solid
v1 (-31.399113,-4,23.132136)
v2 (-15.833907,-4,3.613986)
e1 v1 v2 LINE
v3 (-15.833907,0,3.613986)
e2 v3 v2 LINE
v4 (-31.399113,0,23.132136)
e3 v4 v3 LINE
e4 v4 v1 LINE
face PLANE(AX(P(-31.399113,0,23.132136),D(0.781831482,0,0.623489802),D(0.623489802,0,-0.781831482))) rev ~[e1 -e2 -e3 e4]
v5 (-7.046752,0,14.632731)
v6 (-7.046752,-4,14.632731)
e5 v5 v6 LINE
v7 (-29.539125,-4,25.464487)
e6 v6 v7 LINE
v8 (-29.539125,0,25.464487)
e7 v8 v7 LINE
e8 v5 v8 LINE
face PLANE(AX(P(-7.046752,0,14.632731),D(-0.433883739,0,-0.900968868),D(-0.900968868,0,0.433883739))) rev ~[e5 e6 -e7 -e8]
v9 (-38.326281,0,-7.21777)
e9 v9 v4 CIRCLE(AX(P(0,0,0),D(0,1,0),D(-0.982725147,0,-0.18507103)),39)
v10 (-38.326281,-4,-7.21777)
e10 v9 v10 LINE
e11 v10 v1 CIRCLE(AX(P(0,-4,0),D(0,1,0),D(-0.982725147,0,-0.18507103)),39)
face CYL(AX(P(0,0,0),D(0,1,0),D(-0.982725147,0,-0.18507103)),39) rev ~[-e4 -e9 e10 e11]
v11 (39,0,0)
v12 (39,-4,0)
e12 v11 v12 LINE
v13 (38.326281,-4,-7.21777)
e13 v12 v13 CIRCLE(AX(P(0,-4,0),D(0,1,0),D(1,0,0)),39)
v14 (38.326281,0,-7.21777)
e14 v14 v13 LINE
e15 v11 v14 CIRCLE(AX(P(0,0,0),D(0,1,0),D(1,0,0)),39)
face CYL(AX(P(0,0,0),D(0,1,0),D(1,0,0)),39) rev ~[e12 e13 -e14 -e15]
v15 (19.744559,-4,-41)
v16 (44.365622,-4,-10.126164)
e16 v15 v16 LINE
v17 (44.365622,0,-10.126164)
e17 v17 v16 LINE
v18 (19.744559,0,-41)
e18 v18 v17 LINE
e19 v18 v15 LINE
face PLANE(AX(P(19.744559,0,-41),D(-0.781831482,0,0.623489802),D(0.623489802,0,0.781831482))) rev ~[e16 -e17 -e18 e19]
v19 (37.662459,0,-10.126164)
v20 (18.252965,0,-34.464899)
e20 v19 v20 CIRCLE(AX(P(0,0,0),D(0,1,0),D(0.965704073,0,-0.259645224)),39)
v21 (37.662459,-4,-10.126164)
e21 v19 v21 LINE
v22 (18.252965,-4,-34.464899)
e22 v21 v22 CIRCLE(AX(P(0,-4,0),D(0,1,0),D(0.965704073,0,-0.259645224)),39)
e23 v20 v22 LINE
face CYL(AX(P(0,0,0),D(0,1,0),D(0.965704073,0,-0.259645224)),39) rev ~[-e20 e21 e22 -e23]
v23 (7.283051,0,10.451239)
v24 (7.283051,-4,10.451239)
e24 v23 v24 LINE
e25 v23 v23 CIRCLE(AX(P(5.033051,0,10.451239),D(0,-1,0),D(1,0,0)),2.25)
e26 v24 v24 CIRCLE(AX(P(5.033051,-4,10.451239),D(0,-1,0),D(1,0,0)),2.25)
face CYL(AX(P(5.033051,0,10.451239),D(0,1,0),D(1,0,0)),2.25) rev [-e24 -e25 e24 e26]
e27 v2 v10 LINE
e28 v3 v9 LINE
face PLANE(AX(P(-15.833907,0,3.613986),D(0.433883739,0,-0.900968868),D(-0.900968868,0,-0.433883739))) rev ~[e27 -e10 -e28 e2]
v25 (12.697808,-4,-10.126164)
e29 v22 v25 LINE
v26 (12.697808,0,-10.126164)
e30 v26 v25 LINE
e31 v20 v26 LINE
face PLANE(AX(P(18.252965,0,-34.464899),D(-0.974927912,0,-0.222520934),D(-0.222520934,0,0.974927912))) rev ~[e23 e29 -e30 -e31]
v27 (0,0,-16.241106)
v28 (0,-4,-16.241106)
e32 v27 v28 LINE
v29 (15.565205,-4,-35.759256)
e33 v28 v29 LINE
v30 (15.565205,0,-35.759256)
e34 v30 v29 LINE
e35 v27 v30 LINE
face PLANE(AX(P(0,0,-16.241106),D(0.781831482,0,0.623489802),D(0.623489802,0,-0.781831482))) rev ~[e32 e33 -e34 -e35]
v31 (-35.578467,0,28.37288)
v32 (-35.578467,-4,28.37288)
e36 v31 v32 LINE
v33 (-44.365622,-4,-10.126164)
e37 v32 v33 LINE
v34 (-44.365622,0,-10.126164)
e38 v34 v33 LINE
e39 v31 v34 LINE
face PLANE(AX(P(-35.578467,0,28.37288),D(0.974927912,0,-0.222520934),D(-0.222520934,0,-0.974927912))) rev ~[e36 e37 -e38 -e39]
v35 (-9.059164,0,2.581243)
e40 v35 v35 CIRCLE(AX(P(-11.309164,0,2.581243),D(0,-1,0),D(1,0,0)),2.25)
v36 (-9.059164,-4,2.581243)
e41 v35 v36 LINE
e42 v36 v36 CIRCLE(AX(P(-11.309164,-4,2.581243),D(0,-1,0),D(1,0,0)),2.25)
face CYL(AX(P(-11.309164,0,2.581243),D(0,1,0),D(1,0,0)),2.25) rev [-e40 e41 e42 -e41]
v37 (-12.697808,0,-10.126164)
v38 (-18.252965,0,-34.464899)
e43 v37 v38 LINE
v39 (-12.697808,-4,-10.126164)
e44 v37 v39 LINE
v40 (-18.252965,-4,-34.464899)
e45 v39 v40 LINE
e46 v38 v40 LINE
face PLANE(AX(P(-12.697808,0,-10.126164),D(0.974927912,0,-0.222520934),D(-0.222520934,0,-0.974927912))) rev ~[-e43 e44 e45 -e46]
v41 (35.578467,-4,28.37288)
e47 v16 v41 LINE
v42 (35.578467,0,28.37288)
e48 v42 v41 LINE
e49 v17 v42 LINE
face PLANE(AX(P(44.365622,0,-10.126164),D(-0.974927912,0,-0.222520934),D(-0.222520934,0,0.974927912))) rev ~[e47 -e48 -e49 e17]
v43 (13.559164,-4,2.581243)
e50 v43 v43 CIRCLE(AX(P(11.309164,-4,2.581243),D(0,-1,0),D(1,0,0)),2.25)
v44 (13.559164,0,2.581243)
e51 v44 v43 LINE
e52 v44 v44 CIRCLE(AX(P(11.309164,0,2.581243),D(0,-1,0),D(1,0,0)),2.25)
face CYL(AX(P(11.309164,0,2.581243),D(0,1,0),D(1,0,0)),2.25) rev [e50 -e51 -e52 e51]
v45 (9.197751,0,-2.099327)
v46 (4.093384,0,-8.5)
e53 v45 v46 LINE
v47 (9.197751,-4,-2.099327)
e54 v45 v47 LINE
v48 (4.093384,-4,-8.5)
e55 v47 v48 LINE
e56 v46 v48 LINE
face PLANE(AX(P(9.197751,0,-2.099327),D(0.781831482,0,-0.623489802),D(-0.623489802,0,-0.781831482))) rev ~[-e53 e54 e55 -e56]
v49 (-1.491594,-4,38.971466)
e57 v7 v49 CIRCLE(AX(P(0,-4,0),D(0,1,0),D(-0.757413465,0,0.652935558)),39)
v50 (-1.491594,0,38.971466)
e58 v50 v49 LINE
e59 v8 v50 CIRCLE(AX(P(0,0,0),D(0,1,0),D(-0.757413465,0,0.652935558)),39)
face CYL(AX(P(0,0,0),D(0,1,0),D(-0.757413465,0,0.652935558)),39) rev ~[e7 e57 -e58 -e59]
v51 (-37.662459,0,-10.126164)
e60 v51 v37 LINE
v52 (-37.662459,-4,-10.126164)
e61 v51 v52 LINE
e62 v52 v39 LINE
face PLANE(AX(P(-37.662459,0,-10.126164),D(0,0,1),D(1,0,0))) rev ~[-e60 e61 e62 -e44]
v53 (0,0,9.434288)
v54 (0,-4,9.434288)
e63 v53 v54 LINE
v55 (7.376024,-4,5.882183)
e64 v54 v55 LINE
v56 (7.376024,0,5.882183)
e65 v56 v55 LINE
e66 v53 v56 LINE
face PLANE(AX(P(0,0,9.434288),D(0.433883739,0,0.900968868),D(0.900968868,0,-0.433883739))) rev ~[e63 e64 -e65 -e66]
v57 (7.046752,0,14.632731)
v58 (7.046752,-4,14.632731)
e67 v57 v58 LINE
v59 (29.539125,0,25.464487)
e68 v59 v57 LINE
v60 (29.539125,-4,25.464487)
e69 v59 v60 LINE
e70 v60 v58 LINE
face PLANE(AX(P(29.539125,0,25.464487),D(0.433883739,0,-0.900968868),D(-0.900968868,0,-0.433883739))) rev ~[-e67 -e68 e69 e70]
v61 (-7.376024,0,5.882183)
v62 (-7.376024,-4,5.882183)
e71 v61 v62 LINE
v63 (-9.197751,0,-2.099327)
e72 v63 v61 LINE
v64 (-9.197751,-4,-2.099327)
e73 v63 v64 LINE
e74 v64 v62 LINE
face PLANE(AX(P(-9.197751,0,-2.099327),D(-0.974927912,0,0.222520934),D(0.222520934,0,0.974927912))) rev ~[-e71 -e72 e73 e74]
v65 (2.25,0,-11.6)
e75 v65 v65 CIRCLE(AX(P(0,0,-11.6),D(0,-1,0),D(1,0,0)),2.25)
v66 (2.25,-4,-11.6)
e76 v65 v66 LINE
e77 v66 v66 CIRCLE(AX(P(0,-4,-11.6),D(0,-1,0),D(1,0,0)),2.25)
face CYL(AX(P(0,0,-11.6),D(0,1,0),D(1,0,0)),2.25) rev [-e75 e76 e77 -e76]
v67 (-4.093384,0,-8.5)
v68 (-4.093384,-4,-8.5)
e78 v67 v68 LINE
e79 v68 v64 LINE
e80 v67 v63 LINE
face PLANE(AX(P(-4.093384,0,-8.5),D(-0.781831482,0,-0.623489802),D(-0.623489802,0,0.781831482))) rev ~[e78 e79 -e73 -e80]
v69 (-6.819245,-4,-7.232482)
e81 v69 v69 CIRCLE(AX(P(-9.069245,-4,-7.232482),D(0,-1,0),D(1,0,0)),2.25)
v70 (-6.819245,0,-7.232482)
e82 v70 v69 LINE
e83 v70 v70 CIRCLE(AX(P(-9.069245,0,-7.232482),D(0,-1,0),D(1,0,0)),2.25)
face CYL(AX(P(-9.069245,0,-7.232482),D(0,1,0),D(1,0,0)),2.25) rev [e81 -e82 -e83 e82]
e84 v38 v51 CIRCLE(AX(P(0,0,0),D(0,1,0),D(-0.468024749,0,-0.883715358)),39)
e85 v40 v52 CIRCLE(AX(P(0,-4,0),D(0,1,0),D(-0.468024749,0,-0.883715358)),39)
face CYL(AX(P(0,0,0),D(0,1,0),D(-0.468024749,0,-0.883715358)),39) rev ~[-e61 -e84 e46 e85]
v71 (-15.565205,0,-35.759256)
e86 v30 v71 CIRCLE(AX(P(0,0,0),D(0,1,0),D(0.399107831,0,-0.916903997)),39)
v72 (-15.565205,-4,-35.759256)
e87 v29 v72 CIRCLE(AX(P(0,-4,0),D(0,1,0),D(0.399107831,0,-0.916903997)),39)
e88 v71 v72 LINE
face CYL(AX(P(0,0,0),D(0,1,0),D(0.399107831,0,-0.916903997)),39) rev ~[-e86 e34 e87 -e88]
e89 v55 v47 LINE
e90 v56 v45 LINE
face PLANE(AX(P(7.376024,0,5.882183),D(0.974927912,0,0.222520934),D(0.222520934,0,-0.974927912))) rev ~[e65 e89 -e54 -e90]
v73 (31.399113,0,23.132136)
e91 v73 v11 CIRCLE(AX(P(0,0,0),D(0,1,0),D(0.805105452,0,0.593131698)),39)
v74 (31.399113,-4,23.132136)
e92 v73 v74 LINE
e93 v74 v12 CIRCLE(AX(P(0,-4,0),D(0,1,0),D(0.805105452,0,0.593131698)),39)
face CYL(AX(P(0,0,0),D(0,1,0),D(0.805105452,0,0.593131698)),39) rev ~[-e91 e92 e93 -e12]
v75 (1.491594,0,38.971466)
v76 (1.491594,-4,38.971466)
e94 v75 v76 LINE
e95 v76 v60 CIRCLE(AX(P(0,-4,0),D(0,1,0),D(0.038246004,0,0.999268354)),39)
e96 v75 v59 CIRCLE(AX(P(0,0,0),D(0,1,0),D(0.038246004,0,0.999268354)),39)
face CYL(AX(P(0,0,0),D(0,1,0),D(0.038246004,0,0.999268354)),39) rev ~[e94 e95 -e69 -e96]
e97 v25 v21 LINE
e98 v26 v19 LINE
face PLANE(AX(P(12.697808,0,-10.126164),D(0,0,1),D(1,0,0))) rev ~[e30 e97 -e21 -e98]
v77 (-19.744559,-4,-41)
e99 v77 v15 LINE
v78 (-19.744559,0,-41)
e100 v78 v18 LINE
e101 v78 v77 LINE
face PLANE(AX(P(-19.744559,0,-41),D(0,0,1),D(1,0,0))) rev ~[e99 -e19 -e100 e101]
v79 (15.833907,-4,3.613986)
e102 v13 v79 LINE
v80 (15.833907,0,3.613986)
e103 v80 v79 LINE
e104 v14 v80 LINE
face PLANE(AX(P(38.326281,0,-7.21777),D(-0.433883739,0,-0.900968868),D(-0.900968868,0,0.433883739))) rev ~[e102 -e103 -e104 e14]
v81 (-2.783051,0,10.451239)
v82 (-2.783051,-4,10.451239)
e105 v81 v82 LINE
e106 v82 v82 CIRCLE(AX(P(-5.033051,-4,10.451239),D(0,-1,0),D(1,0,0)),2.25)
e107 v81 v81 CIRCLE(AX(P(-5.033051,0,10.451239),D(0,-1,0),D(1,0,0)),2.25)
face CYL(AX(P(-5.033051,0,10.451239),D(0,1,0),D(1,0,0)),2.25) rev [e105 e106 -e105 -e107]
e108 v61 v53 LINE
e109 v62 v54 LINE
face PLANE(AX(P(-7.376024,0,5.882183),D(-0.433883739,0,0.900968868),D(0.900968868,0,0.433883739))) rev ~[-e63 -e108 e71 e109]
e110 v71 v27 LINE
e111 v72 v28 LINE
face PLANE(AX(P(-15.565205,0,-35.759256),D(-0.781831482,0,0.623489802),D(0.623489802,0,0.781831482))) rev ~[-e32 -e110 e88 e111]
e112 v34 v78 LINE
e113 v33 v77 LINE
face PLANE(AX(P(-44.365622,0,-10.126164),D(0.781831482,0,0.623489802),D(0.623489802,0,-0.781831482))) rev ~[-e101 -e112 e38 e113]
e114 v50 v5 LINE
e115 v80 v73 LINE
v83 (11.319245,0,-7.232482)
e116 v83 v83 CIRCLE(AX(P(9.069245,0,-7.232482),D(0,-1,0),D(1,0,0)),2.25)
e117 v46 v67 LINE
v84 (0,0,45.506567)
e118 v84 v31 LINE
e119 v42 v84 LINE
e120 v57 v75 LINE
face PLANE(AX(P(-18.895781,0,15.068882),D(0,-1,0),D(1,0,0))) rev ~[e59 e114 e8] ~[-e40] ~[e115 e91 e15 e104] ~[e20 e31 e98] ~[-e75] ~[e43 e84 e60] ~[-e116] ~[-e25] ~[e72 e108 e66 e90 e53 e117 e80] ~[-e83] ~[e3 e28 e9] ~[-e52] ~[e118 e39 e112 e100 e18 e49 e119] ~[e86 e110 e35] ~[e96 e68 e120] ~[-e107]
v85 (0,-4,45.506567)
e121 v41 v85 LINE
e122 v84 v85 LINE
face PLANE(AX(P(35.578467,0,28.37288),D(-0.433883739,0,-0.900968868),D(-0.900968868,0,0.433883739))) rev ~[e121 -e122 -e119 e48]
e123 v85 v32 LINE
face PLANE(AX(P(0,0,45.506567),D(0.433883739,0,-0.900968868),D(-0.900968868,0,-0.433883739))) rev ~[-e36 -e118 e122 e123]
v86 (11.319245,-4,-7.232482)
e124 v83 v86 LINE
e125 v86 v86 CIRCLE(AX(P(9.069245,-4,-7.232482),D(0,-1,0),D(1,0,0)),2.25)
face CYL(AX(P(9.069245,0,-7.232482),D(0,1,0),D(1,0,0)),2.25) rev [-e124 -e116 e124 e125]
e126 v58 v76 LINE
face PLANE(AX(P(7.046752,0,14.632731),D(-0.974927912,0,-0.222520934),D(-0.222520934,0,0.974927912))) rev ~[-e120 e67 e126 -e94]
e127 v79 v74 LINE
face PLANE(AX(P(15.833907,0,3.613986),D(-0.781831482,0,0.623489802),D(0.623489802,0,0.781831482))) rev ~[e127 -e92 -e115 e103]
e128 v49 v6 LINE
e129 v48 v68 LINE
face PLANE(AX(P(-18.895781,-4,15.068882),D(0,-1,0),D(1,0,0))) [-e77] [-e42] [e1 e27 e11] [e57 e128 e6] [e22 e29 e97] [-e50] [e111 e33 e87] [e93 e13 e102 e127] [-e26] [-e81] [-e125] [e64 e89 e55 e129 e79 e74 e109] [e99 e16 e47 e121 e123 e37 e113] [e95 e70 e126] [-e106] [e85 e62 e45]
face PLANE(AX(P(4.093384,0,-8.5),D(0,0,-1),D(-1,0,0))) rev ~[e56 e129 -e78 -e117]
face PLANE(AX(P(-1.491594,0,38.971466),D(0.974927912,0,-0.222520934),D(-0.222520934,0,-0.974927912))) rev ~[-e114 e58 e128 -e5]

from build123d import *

# Parameters (mm, degrees)
F0_R     = 2.25
F1_DEPTH = 4


# Not quite as in the source:
# - a feature names something its author has since deleted; it is built from what else it names


with BuildPart() as f1:
    # F0 (on Front) → F1 (new body)
    with BuildSketch(Plane.XZ):
        with BuildLine():
            Line((-7.0467516529, 14.6327305836), (-29.539125133, 25.4644867683))
            ThreePointArc((-29.539125133, 25.4644867683), (-30.4914278163, 24.3161022725), (-31.3991126327, 23.1321362152))
            Line((-31.3991126327, 23.1321362152), (-15.8339072365, 3.6139860008))
            Line((-15.8339072365, 3.6139860008), (-8.7871555836, 7.0075227419))
            Line((-8.7871555836, 7.0075227419), (-7.0467516529, 14.6327305836))
        make_face()
        with BuildLine():
            Line((-1.4915941641, 38.9714658032), (-7.0467516529, 14.6327305836))
            Line((-7.0467516529, 14.6327305836), (0, 11.2391938425))
            Line((0, 11.2391938425), (7.0467516529, 14.6327305836))
            Line((7.0467516529, 14.6327305836), (1.4915941641, 38.9714658032))
            ThreePointArc((1.4915941641, 38.9714658032), (0, 39), (-1.4915941641, 38.9714658032))
        make_face()
        Polygon((0, 11.2391938425), (-7.0467516529, 14.6327305836), (-8.7871555836, 7.0075227419), (-15.8339072365, 3.6139860008), (-10.9574037875, -2.5009559107), (-12.6978077182, -10.1261637524), (-4.8765034491, -10.1261637524), (0, -16.241105664), (4.8765034491, -10.1261637524), (12.6978077182, -10.1261637524), (10.9574037875, -2.5009559107), (15.8339072365, 3.6139860008), (8.7871555836, 7.0075227419), (7.0467516529, 14.6327305836), align=None)
        with Locations((-9.0692451966, -7.2324817016)):
            Circle(F0_R, mode=Mode.SUBTRACT)
        with Locations((0, -11.6)):
            Circle(F0_R, mode=Mode.SUBTRACT)
        with Locations((9.0692451966, -7.2324817016)):
            Circle(F0_R, mode=Mode.SUBTRACT)
        with Locations((-11.3091637813, 2.5812428339)):
            Circle(F0_R, mode=Mode.SUBTRACT)
        with Locations((-5.0330513738, 10.4512388677)):
            Circle(F0_R, mode=Mode.SUBTRACT)
        Polygon((-9.1977509421, -2.0993266316), (-7.376023565, 5.8821825089), (0, 9.4342882455), (7.376023565, 5.8821825089), (9.1977509421, -2.0993266316), (4.0933842599, -8.5), (-4.0933842599, -8.5), align=None, mode=Mode.SUBTRACT)
        with Locations((11.3091637813, 2.5812428339)):
            Circle(F0_R, mode=Mode.SUBTRACT)
        with Locations((5.0330513738, 10.4512388677)):
            Circle(F0_R, mode=Mode.SUBTRACT)
        with BuildLine():
            Line((29.539125133, 25.4644867683), (7.0467516529, 14.6327305836))
            Line((7.0467516529, 14.6327305836), (8.7871555836, 7.0075227419))
            Line((8.7871555836, 7.0075227419), (15.8339072365, 3.6139860008))
            Line((15.8339072365, 3.6139860008), (31.3991126327, 23.1321362152))
            ThreePointArc((31.3991126327, 23.1321362152), (30.4914278163, 24.3161022725), (29.539125133, 25.4644867683))
        make_face()
        with BuildLine():
            Line((38.3262807167, -7.2177701839), (15.8339072365, 3.6139860008))
            Line((15.8339072365, 3.6139860008), (10.9574037875, -2.5009559107))
            Line((10.9574037875, -2.5009559107), (12.6978077182, -10.1261637524))
            Line((12.6978077182, -10.1261637524), (37.6624588637, -10.1261637524))
            ThreePointArc((37.6624588637, -10.1261637524), (38.0221885751, -8.6783164243), (38.3262807167, -7.2177701839))
        make_face()
        with BuildLine():
            Line((4.8765034491, -10.1261637524), (0, -16.241105664))
            Line((0, -16.241105664), (15.5652053962, -35.7592558784))
            ThreePointArc((15.5652053962, -35.7592558784), (16.9214658256, -35.1377858482), (18.252965207, -34.464898972))
            Line((18.252965207, -34.464898972), (12.6978077182, -10.1261637524))
            Line((12.6978077182, -10.1261637524), (4.8765034491, -10.1261637524))
        make_face()
        with BuildLine():
            Line((-4.8765034491, -10.1261637524), (-12.6978077182, -10.1261637524))
            Line((-12.6978077182, -10.1261637524), (-18.252965207, -34.464898972))
            ThreePointArc((-18.252965207, -34.464898972), (-16.9214658256, -35.1377858482), (-15.5652053962, -35.7592558784))
            Line((-15.5652053962, -35.7592558784), (0, -16.241105664))
            Line((0, -16.241105664), (-4.8765034491, -10.1261637524))
        make_face()
        with BuildLine():
            Line((-10.9574037875, -2.5009559107), (-15.8339072365, 3.6139860008))
            Line((-15.8339072365, 3.6139860008), (-38.3262807167, -7.2177701839))
            ThreePointArc((-38.3262807167, -7.2177701839), (-38.0221885751, -8.6783164243), (-37.6624588637, -10.1261637524))
            Line((-37.6624588637, -10.1261637524), (-12.6978077182, -10.1261637524))
            Line((-12.6978077182, -10.1261637524), (-10.9574037875, -2.5009559107))
        make_face()
        with BuildLine():
            Line((-29.539125133, 25.4644867683), (-35.5784666076, 28.3728803368))
            Line((-35.5784666076, 28.3728803368), (-31.3991126327, 23.1321362152))
            ThreePointArc((-31.3991126327, 23.1321362152), (-30.4914278163, 24.3161022725), (-29.539125133, 25.4644867683))
        make_face()
        with BuildLine():
            Line((1.4915941641, 38.9714658032), (0, 45.5065668312))
            Line((0, 45.5065668312), (-1.4915941641, 38.9714658032))
            ThreePointArc((-1.4915941641, 38.9714658032), (0, 39), (1.4915941641, 38.9714658032))
        make_face()
        with BuildLine():
            Line((-38.3262807167, -7.2177701839), (-44.3656221913, -10.1261637524))
            Line((-44.3656221913, -10.1261637524), (-37.6624588637, -10.1261637524))
            ThreePointArc((-37.6624588637, -10.1261637524), (-38.0221885751, -8.6783164243), (-38.3262807167, -7.2177701839))
        make_face()
        with BuildLine():
            Line((31.3991126327, 23.1321362152), (35.5784666076, 28.3728803368))
            Line((35.5784666076, 28.3728803368), (29.539125133, 25.4644867683))
            ThreePointArc((29.539125133, 25.4644867683), (30.4914278163, 24.3161022725), (31.3991126327, 23.1321362152))
        make_face()
        with BuildLine():
            Line((37.6624588637, -10.1261637524), (44.3656221913, -10.1261637524))
            Line((44.3656221913, -10.1261637524), (38.3262807167, -7.2177701839))
            ThreePointArc((38.3262807167, -7.2177701839), (38.0221885751, -8.6783164243), (37.6624588637, -10.1261637524))
        make_face()
        with BuildLine():
            Line((15.5652053962, -35.7592558784), (19.7445593711, -41))
            Line((19.7445593711, -41), (18.252965207, -34.464898972))
            ThreePointArc((18.252965207, -34.464898972), (16.9214658256, -35.1377858482), (15.5652053962, -35.7592558784))
        make_face()
        with BuildLine():
            Line((-18.252965207, -34.464898972), (-19.7445593711, -41))
            Line((-19.7445593711, -41), (-15.5652053962, -35.7592558784))
            ThreePointArc((-15.5652053962, -35.7592558784), (-16.9214658256, -35.1377858482), (-18.252965207, -34.464898972))
        make_face()
        with BuildLine():
            Line((0, 45.5065668312), (-35.5784666076, 28.3728803368))
            Line((-35.5784666076, 28.3728803368), (-29.539125133, 25.4644867683))
            ThreePointArc((-29.539125133, 25.4644867683), (-16.9214658256, 35.1377858482), (-1.4915941641, 38.9714658032))
            Line((-1.4915941641, 38.9714658032), (0, 45.5065668312))
        make_face()
        with BuildLine():
            Line((-31.3991126327, 23.1321362152), (-35.5784666076, 28.3728803368))
            Line((-35.5784666076, 28.3728803368), (-44.3656221913, -10.1261637524))
            Line((-44.3656221913, -10.1261637524), (-38.3262807167, -7.2177701839))
            ThreePointArc((-38.3262807167, -7.2177701839), (-38.0221885751, 8.6783164243), (-31.3991126327, 23.1321362152))
        make_face()
        with BuildLine():
            Line((35.5784666076, 28.3728803368), (0, 45.5065668312))
            Line((0, 45.5065668312), (1.4915941641, 38.9714658032))
            ThreePointArc((1.4915941641, 38.9714658032), (16.9214658256, 35.1377858482), (29.539125133, 25.4644867683))
            Line((29.539125133, 25.4644867683), (35.5784666076, 28.3728803368))
        make_face()
        with BuildLine():
            Line((44.3656221913, -10.1261637524), (35.5784666076, 28.3728803368))
            Line((35.5784666076, 28.3728803368), (31.3991126327, 23.1321362152))
            ThreePointArc((31.3991126327, 23.1321362152), (37.051082256, 12.1744529102), (39, 0))
            ThreePointArc((39, 0), (38.8312048999, -3.62457253), (38.3262807167, -7.2177701839))
            Line((38.3262807167, -7.2177701839), (44.3656221913, -10.1261637524))
        make_face()
        with BuildLine():
            Line((19.7445593711, -41), (44.3656221913, -10.1261637524))
            Line((44.3656221913, -10.1261637524), (37.6624588637, -10.1261637524))
            ThreePointArc((37.6624588637, -10.1261637524), (30.4914278163, -24.3161022725), (18.252965207, -34.464898972))
            Line((18.252965207, -34.464898972), (19.7445593711, -41))
        make_face()
        with BuildLine():
            Line((-15.5652053962, -35.7592558784), (-19.7445593711, -41))
            Line((-19.7445593711, -41), (19.7445593711, -41))
            Line((19.7445593711, -41), (15.5652053962, -35.7592558784))
            ThreePointArc((15.5652053962, -35.7592558784), (0, -39), (-15.5652053962, -35.7592558784))
        make_face()
        with BuildLine():
            Line((-37.6624588637, -10.1261637524), (-44.3656221913, -10.1261637524))
            Line((-44.3656221913, -10.1261637524), (-19.7445593711, -41))
            Line((-19.7445593711, -41), (-18.252965207, -34.464898972))
            ThreePointArc((-18.252965207, -34.464898972), (-30.4914278163, -24.3161022725), (-37.6624588637, -10.1261637524))
        make_face()
    extrude(amount=F1_DEPTH)


solid = f1.part
